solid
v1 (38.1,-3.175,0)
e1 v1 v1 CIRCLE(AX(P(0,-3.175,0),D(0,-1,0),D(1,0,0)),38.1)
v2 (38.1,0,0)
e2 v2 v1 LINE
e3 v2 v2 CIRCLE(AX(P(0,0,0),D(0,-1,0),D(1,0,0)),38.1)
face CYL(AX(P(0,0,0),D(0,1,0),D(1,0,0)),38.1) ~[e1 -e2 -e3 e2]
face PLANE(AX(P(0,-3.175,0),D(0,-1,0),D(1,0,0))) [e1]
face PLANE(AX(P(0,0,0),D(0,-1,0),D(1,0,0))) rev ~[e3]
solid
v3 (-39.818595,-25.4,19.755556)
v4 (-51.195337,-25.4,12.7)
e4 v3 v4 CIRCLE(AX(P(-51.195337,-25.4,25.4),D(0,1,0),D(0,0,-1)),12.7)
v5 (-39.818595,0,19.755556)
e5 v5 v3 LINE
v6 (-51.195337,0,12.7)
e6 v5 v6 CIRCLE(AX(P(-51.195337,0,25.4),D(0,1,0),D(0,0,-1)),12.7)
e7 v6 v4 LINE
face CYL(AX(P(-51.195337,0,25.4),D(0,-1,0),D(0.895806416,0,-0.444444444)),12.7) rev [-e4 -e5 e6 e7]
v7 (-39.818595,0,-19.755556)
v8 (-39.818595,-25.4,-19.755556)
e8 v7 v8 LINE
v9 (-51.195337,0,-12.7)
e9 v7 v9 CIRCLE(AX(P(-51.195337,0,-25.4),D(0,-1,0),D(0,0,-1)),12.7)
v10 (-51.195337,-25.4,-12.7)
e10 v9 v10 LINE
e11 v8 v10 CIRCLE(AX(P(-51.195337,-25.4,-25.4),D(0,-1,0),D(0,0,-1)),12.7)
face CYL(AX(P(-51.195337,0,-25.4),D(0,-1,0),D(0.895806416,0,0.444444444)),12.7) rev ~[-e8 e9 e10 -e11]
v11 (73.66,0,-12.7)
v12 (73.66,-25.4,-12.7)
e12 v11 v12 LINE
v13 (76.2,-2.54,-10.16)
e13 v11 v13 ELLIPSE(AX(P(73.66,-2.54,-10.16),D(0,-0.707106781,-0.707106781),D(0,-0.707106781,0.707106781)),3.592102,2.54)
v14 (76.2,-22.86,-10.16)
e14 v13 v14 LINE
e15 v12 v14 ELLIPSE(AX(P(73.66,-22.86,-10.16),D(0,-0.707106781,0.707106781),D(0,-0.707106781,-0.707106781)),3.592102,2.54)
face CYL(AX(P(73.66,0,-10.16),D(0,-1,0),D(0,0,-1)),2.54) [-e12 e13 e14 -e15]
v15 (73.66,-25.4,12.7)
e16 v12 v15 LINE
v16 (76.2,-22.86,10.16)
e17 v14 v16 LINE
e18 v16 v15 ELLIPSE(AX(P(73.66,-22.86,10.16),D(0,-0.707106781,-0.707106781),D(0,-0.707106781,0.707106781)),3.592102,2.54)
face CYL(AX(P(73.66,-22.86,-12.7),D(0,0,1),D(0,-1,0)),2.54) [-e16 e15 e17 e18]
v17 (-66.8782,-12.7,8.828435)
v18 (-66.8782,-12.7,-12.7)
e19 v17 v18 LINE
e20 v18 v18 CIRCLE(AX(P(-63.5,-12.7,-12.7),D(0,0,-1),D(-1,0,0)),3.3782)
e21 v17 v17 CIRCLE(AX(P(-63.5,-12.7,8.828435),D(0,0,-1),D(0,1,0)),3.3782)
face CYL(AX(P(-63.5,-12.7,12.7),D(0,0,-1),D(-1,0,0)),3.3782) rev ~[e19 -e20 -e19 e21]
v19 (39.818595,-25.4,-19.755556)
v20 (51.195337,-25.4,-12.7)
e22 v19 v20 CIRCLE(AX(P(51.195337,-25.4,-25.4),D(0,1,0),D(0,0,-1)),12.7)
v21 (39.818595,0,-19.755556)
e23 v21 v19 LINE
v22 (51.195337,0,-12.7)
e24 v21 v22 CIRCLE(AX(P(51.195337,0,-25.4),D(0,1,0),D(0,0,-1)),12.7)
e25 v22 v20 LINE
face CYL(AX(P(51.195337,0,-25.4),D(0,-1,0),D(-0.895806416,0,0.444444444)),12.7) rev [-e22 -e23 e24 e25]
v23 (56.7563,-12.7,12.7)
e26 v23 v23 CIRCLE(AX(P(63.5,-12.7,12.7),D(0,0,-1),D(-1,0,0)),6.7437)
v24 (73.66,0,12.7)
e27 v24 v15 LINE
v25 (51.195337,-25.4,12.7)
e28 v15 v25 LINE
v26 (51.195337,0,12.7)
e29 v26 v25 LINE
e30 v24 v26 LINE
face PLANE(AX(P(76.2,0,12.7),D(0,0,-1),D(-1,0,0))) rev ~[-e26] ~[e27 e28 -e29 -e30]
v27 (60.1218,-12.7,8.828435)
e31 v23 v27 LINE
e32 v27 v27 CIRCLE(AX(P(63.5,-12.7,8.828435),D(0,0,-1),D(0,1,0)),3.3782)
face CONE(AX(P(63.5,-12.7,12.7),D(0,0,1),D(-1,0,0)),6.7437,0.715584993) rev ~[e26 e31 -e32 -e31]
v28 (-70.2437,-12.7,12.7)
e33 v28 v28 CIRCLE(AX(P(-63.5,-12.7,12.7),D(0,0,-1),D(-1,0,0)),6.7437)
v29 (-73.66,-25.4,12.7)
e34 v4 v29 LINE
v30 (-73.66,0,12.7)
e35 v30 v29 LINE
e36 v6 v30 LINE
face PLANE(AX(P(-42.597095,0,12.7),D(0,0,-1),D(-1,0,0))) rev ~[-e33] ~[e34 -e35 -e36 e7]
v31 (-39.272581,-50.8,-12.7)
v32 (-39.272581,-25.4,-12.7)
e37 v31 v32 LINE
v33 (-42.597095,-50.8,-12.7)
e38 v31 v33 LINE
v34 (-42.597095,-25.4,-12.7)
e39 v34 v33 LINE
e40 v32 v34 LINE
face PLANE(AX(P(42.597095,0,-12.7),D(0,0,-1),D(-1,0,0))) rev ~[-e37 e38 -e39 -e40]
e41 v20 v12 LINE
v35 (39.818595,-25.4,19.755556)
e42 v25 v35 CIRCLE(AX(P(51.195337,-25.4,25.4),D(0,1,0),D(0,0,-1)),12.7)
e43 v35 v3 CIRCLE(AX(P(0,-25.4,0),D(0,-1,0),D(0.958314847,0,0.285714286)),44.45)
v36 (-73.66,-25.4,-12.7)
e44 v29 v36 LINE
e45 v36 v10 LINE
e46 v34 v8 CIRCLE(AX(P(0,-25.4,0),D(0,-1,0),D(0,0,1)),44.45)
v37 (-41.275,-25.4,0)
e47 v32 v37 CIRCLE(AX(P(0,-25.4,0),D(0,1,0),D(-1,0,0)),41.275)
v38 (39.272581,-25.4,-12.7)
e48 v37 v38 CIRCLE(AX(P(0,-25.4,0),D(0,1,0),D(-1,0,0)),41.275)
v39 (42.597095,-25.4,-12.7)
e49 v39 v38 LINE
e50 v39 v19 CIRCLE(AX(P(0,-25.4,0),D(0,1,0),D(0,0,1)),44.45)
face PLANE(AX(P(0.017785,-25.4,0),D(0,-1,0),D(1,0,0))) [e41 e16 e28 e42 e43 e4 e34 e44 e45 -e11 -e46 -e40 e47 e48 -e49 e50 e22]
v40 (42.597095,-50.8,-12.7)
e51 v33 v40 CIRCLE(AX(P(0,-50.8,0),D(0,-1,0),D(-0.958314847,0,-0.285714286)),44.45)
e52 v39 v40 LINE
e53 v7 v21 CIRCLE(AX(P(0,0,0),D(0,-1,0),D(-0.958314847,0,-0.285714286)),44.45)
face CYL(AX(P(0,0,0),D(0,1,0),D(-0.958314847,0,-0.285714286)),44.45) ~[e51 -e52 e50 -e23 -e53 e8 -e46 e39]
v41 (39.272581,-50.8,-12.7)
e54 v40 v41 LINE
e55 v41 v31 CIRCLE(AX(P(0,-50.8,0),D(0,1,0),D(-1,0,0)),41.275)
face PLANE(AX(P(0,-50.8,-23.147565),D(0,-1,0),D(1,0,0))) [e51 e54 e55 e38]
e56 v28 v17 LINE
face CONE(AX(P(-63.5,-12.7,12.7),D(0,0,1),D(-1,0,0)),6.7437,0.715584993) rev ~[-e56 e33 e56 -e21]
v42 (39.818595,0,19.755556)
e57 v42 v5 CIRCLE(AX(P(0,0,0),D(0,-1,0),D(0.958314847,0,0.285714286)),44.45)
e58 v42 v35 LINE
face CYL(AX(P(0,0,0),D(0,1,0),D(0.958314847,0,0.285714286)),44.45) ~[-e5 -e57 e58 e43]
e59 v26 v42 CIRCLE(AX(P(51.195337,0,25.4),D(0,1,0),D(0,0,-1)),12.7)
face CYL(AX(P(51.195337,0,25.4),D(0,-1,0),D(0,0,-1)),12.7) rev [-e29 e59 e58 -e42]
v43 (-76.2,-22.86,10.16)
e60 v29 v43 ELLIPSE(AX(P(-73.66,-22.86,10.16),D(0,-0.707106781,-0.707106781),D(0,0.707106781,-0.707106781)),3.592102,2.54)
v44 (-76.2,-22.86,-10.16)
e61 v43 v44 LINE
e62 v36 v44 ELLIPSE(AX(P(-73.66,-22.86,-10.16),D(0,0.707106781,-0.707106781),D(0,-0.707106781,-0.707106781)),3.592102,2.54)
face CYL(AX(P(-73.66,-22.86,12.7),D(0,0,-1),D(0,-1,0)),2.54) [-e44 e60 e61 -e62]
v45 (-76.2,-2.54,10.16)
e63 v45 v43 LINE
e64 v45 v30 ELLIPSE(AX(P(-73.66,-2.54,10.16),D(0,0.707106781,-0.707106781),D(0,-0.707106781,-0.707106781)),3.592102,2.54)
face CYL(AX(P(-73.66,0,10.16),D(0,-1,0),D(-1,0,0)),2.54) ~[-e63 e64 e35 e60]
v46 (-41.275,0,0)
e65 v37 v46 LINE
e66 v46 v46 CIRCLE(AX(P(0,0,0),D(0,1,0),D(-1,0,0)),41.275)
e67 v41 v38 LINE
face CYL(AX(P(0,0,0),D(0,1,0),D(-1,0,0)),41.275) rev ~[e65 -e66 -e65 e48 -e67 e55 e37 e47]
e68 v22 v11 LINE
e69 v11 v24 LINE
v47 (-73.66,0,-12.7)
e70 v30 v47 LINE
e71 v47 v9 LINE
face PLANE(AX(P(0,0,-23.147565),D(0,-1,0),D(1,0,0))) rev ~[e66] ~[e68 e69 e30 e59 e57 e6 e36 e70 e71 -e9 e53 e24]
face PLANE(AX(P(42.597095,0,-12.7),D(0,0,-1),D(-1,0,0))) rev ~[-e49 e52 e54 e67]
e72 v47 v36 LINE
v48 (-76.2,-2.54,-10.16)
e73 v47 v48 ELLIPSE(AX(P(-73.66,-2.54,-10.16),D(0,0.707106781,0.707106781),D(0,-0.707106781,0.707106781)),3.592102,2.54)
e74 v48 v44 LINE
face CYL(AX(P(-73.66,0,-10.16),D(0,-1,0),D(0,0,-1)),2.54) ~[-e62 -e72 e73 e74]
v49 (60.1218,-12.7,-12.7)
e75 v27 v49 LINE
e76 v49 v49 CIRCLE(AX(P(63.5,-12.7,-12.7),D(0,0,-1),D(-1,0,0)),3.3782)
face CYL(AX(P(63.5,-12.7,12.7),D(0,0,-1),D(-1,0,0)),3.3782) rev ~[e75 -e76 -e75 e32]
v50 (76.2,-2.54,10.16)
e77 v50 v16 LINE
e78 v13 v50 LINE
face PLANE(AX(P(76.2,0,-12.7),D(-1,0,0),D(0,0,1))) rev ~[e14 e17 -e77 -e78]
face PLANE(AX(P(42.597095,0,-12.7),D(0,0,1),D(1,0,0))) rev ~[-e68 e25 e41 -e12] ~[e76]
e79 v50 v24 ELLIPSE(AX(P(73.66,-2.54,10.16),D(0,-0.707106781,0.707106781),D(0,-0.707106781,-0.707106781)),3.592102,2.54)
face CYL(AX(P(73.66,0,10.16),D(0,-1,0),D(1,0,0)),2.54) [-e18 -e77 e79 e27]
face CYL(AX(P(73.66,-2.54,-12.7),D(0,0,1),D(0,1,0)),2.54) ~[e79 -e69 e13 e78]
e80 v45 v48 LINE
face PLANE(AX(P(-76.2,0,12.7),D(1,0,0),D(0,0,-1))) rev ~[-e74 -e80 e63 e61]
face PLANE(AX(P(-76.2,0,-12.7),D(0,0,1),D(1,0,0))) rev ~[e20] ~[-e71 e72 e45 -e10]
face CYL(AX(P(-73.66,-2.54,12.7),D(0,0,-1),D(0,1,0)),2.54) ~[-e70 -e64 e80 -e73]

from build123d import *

# Parameters (mm, degrees)
F1_DEPTH       = 50.8
F2_DEPTH       = 25.4
F4_D           = 6.7564
F4_CSINK_D     = 13.4874
F4_CSINK_ANGLE = 82
F5_R           = 12.7
F6_R           = 2.54
F7_R           = 41.275
F8_DEPTH       = 72.39
F9_R           = 38.1
F10_DEPTH      = 3.175


with BuildPart() as f1:
    # F0 (on Front) → F1 (new body)
    with BuildSketch(Plane.XZ):
        with BuildLine():
            ThreePointArc((-42.5970949714, -12.7), (0, -44.45), (42.5970949714, -12.7))
            Line((42.5970949714, -12.7), (-42.5970949714, -12.7))
        make_face()
    extrude(amount=F1_DEPTH)

    # F0 (on Front) → F2 (join)
    with BuildSketch(Plane.XZ):
        with BuildLine():
            ThreePointArc((42.5970949714, -12.7), (43.9843345492, -6.4172279265), (44.45, 0))
            ThreePointArc((44.45, 0), (43.9843345492, 6.4172279265), (42.5970949714, 12.7))
            Line((42.5970949714, 12.7), (-42.5970949714, 12.7))
            ThreePointArc((-42.5970949714, 12.7), (-44.45, 0), (-42.5970949714, -12.7))
            Line((-42.5970949714, -12.7), (42.5970949714, -12.7))
        make_face()
        with BuildLine():
            ThreePointArc((42.5970949714, 12.7), (43.9843345492, 6.4172279265), (44.45, 0))
            ThreePointArc((44.45, 0), (43.9843345492, -6.4172279265), (42.5970949714, -12.7))
            Line((42.5970949714, -12.7), (76.2, -12.7))
            Line((76.2, -12.7), (76.2, 12.7))
            Line((76.2, 12.7), (42.5970949714, 12.7))
        make_face()
        with BuildLine():
            Line((-42.5970949714, 12.7), (42.5970949714, 12.7))
            ThreePointArc((42.5970949714, 12.7), (0, 44.45), (-42.5970949714, 12.7))
        make_face()
        with BuildLine():
            ThreePointArc((-42.5970949714, -12.7), (0, -44.45), (42.5970949714, -12.7))
            Line((42.5970949714, -12.7), (-42.5970949714, -12.7))
        make_face()
        with BuildLine():
            ThreePointArc((-42.5970949714, -12.7), (-44.45, 0), (-42.5970949714, 12.7))
            Line((-42.5970949714, 12.7), (-76.2, 12.7))
            Line((-76.2, 12.7), (-76.2, -12.7))
            Line((-76.2, -12.7), (-42.5970949714, -12.7))
        make_face()
    extrude(amount=F2_DEPTH)

    # F4 (through all)
    with Locations(Plane.XY.offset(12.7)):
        with Locations((-63.5, -12.7), (63.5, -12.7)):
            CounterSinkHole(F4_D / 2, F4_CSINK_D / 2, counter_sink_angle=F4_CSINK_ANGLE)

    # F5
    f5_edges = [f1.edges().sort_by_distance(p)[0] for p in [
        (-42.597095, -12.7, -12.7),
        (42.597095, -12.7, -12.7),
        (-42.597095, -12.7, 12.7),
        (42.597095, -12.7, 12.7),
    ]]
    fillet(f5_edges, radius=F5_R)

    # F6
    f6_edges = [f1.edges().sort_by_distance(p)[0] for p in [
        (-76.2, -25.4, 0),
        (-76.2, -12.7, 12.7),
        (-76.2, -12.7, -12.7),
        (-76.2, 0, 0),
        (76.2, -12.7, 12.7),
        (76.2, -12.7, -12.7),
        (76.2, 0, 0),
        (76.2, -25.4, 0),
    ]]
    fillet(f6_edges, radius=F6_R)

    # F7 (on face) → F8 (cut, symmetric)
    with BuildSketch(Plane(origin=(0, 0, 0), x_dir=(-1, 0, 0), z_dir=(0, 1, 0))):
        Circle(F7_R)
    extrude(amount=F8_DEPTH, both=True, mode=Mode.SUBTRACT)


with BuildPart() as f10:
    # F9 (on Front) → F10 (new body)
    with BuildSketch(Plane.XZ):
        Circle(F9_R)
    extrude(amount=F10_DEPTH)


solid = Compound([f1.part, f10.part])
